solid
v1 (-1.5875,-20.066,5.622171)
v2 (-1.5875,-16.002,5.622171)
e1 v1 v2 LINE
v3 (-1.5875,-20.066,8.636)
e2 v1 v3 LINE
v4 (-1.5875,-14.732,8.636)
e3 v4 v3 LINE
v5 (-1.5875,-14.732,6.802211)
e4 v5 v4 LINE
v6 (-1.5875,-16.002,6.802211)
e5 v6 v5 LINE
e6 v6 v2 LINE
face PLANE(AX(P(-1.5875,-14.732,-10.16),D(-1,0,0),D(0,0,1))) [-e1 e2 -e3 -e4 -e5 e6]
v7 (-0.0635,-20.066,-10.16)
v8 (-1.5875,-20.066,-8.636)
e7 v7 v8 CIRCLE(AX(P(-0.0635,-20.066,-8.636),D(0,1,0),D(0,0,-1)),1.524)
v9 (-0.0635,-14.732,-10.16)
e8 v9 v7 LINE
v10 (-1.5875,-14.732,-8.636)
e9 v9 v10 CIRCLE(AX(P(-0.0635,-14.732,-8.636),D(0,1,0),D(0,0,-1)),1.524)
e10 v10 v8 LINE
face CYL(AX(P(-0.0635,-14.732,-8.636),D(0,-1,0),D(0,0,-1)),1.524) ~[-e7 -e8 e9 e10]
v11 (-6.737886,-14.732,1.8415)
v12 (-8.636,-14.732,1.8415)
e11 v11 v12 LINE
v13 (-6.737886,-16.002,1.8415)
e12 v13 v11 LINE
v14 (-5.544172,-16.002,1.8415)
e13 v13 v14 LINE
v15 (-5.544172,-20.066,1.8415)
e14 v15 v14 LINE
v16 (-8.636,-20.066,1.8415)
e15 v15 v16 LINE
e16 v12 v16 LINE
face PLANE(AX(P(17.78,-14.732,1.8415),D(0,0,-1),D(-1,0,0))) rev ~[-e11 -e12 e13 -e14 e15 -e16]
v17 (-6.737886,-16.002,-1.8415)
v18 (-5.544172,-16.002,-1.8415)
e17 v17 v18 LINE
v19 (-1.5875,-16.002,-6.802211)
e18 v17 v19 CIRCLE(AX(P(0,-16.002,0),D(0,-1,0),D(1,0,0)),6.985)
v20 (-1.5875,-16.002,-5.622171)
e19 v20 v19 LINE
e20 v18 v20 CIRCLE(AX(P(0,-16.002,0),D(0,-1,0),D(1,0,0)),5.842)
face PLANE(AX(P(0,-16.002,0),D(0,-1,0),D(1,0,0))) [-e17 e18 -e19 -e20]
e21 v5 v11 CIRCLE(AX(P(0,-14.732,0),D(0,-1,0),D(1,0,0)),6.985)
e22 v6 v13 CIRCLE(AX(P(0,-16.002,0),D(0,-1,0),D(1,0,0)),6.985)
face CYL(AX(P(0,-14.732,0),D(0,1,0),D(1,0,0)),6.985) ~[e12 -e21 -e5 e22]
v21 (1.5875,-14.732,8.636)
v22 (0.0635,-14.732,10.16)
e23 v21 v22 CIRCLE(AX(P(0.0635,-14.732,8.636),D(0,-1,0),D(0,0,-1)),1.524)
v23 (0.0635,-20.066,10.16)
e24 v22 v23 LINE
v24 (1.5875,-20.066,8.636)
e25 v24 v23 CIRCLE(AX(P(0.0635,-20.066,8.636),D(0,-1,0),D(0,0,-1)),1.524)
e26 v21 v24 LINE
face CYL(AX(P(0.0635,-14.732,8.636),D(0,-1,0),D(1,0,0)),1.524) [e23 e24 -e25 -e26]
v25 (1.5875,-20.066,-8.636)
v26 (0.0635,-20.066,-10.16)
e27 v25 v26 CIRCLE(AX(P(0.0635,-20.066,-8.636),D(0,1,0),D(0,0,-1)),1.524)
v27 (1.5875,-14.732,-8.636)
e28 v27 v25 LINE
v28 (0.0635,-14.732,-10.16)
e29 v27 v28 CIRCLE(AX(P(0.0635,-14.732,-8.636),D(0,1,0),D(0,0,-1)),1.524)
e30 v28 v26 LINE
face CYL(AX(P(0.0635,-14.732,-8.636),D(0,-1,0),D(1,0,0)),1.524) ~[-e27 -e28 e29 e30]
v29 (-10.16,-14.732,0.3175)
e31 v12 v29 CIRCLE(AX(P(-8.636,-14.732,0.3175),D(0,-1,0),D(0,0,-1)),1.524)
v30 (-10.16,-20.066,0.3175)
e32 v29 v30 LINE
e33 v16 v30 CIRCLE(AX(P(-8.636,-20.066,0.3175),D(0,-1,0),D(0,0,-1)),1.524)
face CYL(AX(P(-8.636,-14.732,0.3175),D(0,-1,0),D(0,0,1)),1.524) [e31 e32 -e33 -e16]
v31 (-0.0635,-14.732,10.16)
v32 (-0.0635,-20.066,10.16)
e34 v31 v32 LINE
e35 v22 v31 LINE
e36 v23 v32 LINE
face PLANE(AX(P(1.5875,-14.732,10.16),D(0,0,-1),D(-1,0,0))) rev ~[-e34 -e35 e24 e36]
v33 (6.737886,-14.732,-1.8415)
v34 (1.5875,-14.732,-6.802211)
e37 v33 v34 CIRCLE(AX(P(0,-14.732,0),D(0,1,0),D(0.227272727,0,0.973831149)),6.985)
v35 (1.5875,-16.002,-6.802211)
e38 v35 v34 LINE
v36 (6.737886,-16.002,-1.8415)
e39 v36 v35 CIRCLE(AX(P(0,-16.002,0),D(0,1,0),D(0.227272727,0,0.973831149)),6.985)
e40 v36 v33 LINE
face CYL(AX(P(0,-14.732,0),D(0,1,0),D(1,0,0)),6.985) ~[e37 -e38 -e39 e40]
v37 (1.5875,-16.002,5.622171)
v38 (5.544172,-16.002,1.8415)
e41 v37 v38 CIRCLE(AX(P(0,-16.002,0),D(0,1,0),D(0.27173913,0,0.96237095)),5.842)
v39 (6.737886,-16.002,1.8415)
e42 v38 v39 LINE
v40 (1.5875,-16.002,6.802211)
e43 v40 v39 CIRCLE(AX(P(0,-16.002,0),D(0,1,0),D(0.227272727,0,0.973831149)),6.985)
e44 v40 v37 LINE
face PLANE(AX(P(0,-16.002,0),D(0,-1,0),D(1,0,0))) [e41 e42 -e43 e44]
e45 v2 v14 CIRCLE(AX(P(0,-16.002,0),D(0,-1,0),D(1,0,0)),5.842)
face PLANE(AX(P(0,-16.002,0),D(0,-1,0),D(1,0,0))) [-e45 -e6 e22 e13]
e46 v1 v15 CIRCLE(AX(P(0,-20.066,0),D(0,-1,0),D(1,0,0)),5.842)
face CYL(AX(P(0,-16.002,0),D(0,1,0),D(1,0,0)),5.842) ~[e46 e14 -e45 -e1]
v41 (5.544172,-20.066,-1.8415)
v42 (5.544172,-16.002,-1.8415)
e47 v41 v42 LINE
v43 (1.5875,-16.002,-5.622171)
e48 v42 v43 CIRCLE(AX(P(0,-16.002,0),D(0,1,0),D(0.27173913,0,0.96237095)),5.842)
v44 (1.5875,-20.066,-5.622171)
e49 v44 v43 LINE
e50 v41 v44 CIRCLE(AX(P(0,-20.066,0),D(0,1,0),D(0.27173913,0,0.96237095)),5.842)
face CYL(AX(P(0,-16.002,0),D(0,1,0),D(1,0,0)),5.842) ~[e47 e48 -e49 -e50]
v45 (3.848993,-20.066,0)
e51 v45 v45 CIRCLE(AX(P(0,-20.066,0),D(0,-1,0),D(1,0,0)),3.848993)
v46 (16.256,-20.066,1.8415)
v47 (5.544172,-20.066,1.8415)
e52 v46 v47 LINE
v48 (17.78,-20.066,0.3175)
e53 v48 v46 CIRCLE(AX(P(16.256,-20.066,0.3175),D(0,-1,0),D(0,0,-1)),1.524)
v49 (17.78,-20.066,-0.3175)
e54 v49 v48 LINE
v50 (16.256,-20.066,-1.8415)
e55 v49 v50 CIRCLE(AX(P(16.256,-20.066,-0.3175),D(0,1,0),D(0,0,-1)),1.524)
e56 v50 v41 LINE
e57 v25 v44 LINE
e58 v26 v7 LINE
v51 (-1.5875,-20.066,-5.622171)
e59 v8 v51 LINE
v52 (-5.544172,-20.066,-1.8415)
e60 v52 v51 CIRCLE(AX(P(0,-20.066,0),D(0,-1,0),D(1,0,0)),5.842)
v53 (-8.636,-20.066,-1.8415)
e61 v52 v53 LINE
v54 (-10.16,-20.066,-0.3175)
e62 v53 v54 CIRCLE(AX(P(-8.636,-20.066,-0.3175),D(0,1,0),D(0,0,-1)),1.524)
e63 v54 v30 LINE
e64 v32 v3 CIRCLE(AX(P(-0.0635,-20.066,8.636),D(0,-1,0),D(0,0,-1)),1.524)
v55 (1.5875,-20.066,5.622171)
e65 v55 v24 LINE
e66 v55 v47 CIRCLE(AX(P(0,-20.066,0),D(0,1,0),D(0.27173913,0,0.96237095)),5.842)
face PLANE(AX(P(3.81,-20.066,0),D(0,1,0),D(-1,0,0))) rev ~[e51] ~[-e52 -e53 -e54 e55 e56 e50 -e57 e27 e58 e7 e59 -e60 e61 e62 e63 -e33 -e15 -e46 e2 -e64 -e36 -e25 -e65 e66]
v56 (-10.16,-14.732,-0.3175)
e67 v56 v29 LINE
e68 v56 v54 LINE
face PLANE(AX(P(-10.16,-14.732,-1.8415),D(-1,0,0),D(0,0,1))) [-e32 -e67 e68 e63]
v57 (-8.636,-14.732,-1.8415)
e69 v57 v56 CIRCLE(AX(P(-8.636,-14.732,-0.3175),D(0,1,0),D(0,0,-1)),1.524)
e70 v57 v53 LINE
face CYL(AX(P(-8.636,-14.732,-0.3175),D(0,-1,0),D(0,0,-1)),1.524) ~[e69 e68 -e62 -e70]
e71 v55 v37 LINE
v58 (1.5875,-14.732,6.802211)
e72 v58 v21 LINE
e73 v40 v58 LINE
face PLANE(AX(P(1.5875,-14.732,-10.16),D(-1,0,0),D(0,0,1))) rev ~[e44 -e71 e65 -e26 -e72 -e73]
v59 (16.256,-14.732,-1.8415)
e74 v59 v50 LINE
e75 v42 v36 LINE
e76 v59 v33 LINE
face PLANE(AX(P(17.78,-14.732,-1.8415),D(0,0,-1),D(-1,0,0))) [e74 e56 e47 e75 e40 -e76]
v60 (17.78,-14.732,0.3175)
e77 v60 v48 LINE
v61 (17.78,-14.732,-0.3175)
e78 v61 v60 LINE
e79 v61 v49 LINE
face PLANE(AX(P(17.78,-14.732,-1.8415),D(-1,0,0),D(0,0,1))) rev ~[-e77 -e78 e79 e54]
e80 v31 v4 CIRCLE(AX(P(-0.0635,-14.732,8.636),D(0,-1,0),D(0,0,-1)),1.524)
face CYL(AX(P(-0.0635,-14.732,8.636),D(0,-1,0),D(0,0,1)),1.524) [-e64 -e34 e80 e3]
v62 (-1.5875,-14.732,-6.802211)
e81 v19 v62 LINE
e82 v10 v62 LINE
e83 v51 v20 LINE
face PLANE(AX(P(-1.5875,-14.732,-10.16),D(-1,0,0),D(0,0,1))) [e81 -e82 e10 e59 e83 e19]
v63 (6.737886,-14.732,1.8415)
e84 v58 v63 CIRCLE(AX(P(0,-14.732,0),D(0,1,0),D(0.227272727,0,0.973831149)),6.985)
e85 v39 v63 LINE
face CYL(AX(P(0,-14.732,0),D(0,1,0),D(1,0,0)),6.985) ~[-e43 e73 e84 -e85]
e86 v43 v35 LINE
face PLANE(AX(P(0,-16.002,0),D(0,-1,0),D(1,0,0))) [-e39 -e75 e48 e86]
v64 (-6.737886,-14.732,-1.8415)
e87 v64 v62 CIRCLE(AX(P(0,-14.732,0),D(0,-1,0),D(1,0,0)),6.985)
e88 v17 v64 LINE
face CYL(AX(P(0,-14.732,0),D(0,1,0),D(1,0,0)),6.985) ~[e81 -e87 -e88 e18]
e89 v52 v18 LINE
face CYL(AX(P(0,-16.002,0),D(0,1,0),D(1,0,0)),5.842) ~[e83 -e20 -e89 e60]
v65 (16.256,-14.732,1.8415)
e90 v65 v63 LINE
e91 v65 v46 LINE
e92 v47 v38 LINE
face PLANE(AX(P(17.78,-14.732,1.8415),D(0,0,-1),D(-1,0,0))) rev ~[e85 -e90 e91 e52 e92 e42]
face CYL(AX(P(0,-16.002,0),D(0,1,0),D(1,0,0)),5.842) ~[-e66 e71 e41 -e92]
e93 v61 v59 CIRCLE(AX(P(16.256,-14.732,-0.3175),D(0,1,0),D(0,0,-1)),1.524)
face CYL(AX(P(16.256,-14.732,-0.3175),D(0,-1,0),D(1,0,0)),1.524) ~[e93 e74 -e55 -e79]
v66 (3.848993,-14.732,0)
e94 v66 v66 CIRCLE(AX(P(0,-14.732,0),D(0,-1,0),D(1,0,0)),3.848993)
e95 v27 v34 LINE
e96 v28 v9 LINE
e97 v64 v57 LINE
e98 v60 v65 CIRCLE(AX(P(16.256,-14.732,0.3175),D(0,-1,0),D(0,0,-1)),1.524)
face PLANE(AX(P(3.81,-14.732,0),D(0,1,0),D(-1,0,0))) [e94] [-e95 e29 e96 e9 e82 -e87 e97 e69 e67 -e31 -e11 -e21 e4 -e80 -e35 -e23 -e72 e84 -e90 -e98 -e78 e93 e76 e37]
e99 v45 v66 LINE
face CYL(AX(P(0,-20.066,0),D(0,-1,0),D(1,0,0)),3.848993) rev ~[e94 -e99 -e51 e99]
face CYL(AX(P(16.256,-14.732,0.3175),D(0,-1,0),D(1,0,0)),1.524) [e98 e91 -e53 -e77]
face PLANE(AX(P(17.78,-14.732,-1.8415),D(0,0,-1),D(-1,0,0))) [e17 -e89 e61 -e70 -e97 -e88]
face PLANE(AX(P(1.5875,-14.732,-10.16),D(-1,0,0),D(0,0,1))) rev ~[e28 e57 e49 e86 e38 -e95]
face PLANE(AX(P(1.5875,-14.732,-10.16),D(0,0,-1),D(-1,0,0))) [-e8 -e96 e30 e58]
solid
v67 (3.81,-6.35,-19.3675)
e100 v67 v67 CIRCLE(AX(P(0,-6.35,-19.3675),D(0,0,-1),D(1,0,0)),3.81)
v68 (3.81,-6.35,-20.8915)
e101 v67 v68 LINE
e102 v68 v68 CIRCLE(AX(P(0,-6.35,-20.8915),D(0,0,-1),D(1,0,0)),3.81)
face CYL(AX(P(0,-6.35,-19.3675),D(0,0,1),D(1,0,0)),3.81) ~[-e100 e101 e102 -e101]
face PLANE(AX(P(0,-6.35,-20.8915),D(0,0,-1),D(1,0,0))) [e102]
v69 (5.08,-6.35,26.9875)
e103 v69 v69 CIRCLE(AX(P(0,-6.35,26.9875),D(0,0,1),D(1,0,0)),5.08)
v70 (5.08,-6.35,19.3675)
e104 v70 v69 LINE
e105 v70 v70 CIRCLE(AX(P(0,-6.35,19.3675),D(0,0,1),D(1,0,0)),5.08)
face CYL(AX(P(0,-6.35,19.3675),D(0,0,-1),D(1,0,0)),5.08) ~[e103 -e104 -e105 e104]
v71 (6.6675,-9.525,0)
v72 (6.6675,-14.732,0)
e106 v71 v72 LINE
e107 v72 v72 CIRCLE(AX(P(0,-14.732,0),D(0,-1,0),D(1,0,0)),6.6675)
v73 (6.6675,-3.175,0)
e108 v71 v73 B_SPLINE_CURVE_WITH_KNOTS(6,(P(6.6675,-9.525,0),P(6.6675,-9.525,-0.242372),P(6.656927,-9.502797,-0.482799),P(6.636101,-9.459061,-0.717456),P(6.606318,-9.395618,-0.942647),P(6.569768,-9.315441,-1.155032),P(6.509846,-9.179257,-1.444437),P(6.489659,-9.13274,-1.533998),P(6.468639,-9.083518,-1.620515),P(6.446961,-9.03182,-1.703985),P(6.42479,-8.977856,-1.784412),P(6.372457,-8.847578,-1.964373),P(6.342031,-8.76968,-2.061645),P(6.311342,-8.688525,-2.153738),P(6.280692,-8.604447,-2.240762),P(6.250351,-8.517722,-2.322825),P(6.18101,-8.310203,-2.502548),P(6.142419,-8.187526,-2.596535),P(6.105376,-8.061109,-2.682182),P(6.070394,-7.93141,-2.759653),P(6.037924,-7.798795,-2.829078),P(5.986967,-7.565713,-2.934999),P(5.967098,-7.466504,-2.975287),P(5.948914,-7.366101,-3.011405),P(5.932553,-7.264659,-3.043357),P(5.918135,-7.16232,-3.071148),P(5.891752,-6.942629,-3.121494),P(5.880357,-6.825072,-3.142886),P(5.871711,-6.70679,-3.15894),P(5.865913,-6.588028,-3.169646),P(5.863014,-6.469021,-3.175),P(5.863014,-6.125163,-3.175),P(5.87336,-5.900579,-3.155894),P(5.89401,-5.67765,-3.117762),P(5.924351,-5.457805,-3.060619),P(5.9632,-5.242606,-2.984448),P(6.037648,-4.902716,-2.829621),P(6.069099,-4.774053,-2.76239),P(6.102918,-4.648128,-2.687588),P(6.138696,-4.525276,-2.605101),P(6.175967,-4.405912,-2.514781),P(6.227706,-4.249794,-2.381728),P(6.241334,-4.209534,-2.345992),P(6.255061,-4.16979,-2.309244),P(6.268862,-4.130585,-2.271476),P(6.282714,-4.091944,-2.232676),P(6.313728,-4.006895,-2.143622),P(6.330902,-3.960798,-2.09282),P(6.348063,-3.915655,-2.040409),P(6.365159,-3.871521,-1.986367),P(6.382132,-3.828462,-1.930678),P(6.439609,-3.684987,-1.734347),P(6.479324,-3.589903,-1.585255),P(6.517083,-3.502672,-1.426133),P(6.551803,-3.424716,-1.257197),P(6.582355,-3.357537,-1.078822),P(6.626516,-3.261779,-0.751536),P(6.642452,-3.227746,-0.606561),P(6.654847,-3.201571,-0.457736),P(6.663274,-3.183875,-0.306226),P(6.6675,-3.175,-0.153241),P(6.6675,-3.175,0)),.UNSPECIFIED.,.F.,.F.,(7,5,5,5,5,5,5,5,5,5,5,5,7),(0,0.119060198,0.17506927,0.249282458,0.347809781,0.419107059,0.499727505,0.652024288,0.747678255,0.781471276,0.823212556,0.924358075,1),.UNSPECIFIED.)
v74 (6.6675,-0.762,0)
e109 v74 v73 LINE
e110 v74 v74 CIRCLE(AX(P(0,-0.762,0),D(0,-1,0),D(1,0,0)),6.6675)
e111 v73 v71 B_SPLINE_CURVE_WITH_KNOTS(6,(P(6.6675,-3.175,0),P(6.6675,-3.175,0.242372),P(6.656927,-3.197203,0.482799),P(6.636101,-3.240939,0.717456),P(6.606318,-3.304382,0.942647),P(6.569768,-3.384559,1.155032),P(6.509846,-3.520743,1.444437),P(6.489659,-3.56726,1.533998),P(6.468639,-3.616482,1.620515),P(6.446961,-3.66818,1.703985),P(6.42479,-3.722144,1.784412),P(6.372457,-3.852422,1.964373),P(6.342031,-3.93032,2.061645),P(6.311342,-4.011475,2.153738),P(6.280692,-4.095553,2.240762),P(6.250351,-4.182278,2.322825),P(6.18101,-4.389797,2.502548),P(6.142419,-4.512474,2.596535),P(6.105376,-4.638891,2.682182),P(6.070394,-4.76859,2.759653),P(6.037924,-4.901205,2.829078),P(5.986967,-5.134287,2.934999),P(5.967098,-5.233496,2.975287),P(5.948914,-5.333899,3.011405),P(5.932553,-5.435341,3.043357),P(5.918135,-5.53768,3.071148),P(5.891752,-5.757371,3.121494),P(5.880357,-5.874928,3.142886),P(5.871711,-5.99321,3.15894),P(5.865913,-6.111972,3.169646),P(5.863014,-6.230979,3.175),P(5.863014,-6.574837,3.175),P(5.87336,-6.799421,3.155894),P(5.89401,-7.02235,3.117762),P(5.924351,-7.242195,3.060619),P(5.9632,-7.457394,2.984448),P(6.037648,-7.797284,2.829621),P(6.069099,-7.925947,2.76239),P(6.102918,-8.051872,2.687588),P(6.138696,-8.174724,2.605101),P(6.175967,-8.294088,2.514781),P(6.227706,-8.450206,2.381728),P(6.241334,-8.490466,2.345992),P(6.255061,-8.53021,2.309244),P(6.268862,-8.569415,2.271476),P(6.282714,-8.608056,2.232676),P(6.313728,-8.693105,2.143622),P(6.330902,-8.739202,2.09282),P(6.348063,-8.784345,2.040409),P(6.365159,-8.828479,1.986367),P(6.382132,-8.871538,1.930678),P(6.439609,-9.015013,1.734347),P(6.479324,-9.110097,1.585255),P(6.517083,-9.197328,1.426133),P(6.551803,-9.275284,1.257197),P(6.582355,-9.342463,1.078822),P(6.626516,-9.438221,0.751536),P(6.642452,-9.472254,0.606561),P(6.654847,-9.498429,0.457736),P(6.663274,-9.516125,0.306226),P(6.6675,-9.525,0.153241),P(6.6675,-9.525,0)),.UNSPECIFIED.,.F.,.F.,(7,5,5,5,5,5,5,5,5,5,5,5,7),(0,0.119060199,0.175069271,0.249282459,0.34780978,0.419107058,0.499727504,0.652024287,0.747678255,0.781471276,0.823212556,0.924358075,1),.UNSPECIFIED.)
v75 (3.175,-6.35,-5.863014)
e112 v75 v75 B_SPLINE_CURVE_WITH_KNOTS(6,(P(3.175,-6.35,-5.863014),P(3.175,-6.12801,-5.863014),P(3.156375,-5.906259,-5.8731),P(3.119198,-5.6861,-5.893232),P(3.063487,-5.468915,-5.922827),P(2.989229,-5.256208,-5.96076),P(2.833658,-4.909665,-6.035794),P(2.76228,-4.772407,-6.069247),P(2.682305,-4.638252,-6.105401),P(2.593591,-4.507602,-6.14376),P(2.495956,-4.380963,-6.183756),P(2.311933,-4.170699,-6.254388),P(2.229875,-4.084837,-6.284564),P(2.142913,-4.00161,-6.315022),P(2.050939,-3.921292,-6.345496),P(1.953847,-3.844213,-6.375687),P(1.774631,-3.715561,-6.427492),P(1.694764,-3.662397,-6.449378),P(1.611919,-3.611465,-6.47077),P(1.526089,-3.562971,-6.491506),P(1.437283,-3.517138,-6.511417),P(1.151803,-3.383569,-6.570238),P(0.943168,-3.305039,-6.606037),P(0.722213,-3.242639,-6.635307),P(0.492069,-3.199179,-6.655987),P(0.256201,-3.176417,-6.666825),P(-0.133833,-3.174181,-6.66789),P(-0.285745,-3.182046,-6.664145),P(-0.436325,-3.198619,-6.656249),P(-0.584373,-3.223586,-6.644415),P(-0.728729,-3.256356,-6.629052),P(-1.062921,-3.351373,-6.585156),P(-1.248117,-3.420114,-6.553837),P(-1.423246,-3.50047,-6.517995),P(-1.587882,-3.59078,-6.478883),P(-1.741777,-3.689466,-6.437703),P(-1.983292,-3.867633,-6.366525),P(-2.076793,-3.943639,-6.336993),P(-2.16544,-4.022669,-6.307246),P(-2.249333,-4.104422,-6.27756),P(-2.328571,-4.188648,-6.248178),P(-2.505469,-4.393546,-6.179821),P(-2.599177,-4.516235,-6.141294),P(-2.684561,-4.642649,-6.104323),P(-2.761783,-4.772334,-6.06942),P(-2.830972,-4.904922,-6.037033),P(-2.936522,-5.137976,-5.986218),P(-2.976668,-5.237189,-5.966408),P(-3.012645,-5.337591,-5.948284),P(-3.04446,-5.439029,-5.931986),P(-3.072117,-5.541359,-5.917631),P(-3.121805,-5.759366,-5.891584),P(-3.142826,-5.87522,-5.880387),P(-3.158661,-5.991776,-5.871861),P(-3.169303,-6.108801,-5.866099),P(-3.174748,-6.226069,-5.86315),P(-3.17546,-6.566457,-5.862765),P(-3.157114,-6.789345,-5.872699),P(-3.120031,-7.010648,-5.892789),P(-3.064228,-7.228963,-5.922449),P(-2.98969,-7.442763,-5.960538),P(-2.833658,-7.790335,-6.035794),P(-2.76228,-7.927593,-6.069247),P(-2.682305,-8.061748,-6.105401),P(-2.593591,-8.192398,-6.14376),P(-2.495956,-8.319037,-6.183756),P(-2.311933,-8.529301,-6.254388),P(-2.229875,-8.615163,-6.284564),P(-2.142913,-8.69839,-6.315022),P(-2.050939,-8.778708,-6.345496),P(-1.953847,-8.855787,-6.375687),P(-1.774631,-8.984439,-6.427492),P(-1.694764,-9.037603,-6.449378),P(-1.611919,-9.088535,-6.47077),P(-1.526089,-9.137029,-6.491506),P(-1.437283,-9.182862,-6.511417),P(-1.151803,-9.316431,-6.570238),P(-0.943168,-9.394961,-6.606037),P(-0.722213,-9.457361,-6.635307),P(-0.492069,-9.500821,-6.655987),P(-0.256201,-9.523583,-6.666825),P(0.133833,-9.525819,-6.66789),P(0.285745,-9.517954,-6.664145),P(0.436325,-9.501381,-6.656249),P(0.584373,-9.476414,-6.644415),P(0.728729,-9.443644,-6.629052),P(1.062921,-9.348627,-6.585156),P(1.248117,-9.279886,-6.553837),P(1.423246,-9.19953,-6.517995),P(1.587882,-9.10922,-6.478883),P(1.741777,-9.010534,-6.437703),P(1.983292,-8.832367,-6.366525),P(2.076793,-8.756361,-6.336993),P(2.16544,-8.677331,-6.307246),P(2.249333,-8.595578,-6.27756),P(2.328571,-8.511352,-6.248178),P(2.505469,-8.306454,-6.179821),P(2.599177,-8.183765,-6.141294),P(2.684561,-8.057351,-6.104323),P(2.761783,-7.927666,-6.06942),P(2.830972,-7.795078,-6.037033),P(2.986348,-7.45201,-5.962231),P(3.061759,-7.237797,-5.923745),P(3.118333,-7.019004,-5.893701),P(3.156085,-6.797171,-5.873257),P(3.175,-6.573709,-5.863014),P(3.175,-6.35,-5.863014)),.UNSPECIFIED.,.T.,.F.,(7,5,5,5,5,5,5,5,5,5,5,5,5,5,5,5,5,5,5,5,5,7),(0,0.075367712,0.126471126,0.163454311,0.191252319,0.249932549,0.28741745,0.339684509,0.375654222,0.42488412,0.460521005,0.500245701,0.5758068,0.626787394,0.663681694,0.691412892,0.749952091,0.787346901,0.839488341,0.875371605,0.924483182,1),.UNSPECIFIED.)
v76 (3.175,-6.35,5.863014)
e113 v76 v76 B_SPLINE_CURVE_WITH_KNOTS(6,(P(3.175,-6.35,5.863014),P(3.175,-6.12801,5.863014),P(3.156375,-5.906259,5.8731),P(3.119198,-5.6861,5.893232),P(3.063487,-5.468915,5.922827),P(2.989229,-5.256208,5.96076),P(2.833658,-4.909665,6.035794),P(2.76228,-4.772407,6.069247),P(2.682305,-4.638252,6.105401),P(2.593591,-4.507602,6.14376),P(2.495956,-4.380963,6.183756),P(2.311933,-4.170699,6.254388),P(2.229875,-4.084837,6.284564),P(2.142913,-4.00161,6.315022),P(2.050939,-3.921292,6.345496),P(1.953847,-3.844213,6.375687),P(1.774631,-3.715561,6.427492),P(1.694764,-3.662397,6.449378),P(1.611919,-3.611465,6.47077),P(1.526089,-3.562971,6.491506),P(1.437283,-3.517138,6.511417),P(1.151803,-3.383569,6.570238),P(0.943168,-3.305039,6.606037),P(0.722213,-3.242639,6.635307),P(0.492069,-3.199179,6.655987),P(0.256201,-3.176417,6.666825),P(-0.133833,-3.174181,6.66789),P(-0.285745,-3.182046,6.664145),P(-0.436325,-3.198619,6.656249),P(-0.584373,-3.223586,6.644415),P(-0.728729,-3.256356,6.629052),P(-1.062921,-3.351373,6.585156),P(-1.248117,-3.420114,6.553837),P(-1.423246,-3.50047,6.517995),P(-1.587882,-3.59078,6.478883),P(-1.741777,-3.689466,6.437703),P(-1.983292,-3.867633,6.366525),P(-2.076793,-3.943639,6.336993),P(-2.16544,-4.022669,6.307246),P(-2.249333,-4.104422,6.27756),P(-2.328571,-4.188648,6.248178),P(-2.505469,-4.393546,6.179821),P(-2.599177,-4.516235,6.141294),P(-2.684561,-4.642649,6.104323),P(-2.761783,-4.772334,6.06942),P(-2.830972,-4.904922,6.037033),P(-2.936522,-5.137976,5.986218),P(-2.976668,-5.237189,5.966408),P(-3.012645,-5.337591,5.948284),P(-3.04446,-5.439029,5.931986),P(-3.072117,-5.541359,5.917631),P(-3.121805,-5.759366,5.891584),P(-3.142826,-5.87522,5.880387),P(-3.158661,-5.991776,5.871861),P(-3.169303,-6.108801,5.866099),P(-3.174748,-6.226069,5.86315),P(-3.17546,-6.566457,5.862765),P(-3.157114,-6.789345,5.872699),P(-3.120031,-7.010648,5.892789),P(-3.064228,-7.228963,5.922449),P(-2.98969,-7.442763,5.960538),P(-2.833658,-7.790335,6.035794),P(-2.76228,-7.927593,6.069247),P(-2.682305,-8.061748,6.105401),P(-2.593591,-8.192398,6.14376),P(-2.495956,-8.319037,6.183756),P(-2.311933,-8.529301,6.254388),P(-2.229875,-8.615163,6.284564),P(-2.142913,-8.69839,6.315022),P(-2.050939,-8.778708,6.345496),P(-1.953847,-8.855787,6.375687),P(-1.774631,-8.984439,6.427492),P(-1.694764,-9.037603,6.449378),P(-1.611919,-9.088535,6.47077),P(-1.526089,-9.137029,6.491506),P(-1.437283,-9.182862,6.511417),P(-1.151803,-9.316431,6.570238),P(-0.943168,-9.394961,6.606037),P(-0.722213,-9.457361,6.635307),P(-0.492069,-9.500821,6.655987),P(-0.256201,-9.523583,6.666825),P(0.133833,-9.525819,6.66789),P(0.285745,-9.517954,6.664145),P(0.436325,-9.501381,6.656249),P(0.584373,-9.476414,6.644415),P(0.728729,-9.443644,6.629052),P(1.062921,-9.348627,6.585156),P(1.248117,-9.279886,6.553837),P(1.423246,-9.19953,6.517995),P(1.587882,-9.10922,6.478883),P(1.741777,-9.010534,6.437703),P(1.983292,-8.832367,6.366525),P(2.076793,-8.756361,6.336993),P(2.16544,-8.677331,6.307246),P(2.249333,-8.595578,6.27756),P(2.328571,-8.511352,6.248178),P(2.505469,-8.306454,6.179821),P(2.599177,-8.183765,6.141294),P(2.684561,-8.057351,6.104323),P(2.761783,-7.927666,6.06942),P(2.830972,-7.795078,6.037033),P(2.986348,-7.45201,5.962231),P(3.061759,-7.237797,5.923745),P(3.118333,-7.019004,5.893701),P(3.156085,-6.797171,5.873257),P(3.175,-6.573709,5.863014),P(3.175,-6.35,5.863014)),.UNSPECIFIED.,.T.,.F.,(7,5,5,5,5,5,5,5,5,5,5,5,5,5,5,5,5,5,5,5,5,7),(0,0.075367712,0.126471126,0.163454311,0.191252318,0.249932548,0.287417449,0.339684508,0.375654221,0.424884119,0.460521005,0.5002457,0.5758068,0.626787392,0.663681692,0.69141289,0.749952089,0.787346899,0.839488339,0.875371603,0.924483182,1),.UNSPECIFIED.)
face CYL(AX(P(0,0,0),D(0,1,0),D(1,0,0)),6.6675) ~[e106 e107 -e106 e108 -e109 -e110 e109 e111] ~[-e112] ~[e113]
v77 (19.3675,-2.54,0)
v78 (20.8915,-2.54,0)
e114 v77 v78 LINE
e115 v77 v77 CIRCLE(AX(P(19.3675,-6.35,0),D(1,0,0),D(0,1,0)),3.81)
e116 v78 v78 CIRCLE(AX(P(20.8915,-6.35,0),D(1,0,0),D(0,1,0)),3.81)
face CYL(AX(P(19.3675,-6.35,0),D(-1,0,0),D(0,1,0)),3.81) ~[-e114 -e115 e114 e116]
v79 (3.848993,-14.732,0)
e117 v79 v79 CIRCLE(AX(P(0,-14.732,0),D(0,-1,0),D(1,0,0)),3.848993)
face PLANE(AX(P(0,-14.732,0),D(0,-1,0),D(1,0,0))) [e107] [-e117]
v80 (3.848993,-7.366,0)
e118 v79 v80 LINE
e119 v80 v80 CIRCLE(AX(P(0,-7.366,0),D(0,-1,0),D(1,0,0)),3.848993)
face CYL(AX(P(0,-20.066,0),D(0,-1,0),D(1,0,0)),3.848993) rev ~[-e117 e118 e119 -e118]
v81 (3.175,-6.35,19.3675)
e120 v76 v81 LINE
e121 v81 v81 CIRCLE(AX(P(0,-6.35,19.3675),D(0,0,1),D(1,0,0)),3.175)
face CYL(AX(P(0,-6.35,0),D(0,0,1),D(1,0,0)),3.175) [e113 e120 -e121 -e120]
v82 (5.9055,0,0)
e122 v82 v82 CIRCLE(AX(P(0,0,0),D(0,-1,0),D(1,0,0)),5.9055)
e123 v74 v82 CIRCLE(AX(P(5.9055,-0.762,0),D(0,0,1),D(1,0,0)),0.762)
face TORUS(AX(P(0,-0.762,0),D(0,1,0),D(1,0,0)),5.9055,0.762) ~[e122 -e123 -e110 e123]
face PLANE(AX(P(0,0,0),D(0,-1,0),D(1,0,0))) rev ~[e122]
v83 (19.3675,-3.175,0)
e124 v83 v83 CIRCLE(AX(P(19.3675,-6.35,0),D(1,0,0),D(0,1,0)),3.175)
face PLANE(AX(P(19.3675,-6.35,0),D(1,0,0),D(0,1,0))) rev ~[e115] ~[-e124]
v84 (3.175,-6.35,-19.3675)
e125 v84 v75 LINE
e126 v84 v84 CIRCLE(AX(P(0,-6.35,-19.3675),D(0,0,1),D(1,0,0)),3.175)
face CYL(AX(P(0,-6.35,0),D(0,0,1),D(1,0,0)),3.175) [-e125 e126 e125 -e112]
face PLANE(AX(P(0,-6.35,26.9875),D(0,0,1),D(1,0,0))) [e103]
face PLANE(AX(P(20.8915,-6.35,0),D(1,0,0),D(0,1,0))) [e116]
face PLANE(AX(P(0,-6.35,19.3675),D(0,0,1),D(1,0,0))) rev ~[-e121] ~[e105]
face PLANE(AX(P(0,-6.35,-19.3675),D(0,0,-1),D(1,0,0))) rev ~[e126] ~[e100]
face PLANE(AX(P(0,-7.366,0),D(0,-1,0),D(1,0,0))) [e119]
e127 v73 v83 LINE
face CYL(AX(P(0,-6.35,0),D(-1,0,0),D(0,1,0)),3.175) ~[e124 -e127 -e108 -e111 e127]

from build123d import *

# Parameters (mm, degrees)
F0_R      = 6.6675
F1_DEPTH  = 14.732
F2_R      = 3.175
F3_DEPTH  = 19.3675
F4_R      = 3.175
F5_DEPTH  = 19.3675
F6_R      = 0.762
F7_R      = 5.08
F8_DEPTH  = 7.62
F9_R      = 3.81
F10_DEPTH = 1.524
F11_R     = 3.81
F12_DEPTH = 1.524
F13_R     = 6.985
F14_DEPTH = 1.27
F15_R     = 5.842
F15_R_2   = 3.81
F16_DEPTH = 4.064
F17_W     = 3.175
F17_H     = 20.32
F18_DEPTH = 5.334
F19_W     = 27.94
F19_H     = 3.683
F20_DEPTH = 5.334
F21_R     = 3.8489929185
F22_DEPTH = 12.7
F23_R     = 1.524


with BuildPart() as f1:
    # F0 (on Front) → F1 (new body)
    with BuildSketch(Plane.XZ):
        Circle(F0_R)
    extrude(amount=F1_DEPTH)

    # F2 (on Top) → F3 (join, symmetric)
    with BuildSketch(Plane.XY):
        with Locations((0, -6.35)):
            Circle(F2_R)
    extrude(amount=F3_DEPTH, both=True)

    # F4 (on Right) → F5 (join)
    with BuildSketch(Plane.YZ):
        with Locations((-6.35, 0)):
            Circle(F4_R)
    extrude(amount=F5_DEPTH)

    # F6
    f6_edges = [f1.edges().sort_by_distance(p)[0] for p in [
        (-6.6675, 0, 0),
    ]]
    fillet(f6_edges, radius=F6_R)

    # F7 (on face) → F8 (join)
    with BuildSketch(Plane.XY.offset(19.3675)):
        with Locations((0, -6.35)):
            Circle(F7_R)
    extrude(amount=F8_DEPTH)

    # F9 (on face) → F10 (join)
    with BuildSketch(Plane.YZ.offset(19.3675)):
        with Locations((-6.35, 0)):
            Circle(F9_R)
    extrude(amount=F10_DEPTH)

    # F11 (on face) → F12 (join)
    with BuildSketch(Plane(origin=(0, 0, -19.3675), x_dir=(1, 0, 0), z_dir=(0, 0, -1))):
        with Locations((0, 6.35)):
            Circle(F11_R)
    extrude(amount=F12_DEPTH)


with BuildPart() as f14:
    # F13 (on face) → F14 (new body)
    with BuildSketch(Plane.XZ.offset(14.732)):
        Circle(F13_R)
    extrude(amount=F14_DEPTH)

    # F15 (on face) → F16 (join)
    with BuildSketch(Plane.XZ.offset(16.002)):
        Circle(F15_R)
        Circle(F15_R_2, mode=Mode.SUBTRACT)
    extrude(amount=F16_DEPTH)

    # F17 (on face) → F18 (join, through all)
    with BuildSketch(Plane(origin=(0, -14.732, 0), x_dir=(-1, 0, 0), z_dir=(0, 1, 0))):
        Rectangle(F17_W, F17_H)
    extrude(amount=-F18_DEPTH)

    # F19 (on face) → F20 (join, through all)
    with BuildSketch(Plane(origin=(0, -14.732, 0), x_dir=(-1, 0, 0), z_dir=(0, 1, 0))):
        with Locations((-3.81, 0)):
            Rectangle(F19_W, F19_H)
    extrude(amount=-F20_DEPTH)


with BuildPart() as f22_tool:
    # F21 (on face) → F22 (new body)
    with BuildSketch(Plane.XZ.offset(20.066)):
        Circle(F21_R)
    extrude(amount=-F22_DEPTH)


with BuildPart() as f1_1:
    add(f1.part)

    # F22: cut by f22_tool
    add(f22_tool.part, mode=Mode.SUBTRACT)


with BuildPart() as f14_1:
    add(f14.part)

    # F22: cut by f22_tool
    add(f22_tool.part, mode=Mode.SUBTRACT)

    # F23
    f23_edges = [f14_1.edges().sort_by_distance(p)[0] for p in [
        (17.78, -17.399, -1.8415),
        (17.78, -17.399, 1.8415),
        (1.5875, -17.399, 10.16),
        (-1.5875, -17.399, 10.16),
        (-10.16, -17.399, 1.8415),
        (-10.16, -17.399, -1.8415),
        (-1.5875, -17.399, -10.16),
        (1.5875, -17.399, -10.16),
    ]]
    fillet(f23_edges, radius=F23_R)


solid = Compound([f1_1.part, f14_1.part])
